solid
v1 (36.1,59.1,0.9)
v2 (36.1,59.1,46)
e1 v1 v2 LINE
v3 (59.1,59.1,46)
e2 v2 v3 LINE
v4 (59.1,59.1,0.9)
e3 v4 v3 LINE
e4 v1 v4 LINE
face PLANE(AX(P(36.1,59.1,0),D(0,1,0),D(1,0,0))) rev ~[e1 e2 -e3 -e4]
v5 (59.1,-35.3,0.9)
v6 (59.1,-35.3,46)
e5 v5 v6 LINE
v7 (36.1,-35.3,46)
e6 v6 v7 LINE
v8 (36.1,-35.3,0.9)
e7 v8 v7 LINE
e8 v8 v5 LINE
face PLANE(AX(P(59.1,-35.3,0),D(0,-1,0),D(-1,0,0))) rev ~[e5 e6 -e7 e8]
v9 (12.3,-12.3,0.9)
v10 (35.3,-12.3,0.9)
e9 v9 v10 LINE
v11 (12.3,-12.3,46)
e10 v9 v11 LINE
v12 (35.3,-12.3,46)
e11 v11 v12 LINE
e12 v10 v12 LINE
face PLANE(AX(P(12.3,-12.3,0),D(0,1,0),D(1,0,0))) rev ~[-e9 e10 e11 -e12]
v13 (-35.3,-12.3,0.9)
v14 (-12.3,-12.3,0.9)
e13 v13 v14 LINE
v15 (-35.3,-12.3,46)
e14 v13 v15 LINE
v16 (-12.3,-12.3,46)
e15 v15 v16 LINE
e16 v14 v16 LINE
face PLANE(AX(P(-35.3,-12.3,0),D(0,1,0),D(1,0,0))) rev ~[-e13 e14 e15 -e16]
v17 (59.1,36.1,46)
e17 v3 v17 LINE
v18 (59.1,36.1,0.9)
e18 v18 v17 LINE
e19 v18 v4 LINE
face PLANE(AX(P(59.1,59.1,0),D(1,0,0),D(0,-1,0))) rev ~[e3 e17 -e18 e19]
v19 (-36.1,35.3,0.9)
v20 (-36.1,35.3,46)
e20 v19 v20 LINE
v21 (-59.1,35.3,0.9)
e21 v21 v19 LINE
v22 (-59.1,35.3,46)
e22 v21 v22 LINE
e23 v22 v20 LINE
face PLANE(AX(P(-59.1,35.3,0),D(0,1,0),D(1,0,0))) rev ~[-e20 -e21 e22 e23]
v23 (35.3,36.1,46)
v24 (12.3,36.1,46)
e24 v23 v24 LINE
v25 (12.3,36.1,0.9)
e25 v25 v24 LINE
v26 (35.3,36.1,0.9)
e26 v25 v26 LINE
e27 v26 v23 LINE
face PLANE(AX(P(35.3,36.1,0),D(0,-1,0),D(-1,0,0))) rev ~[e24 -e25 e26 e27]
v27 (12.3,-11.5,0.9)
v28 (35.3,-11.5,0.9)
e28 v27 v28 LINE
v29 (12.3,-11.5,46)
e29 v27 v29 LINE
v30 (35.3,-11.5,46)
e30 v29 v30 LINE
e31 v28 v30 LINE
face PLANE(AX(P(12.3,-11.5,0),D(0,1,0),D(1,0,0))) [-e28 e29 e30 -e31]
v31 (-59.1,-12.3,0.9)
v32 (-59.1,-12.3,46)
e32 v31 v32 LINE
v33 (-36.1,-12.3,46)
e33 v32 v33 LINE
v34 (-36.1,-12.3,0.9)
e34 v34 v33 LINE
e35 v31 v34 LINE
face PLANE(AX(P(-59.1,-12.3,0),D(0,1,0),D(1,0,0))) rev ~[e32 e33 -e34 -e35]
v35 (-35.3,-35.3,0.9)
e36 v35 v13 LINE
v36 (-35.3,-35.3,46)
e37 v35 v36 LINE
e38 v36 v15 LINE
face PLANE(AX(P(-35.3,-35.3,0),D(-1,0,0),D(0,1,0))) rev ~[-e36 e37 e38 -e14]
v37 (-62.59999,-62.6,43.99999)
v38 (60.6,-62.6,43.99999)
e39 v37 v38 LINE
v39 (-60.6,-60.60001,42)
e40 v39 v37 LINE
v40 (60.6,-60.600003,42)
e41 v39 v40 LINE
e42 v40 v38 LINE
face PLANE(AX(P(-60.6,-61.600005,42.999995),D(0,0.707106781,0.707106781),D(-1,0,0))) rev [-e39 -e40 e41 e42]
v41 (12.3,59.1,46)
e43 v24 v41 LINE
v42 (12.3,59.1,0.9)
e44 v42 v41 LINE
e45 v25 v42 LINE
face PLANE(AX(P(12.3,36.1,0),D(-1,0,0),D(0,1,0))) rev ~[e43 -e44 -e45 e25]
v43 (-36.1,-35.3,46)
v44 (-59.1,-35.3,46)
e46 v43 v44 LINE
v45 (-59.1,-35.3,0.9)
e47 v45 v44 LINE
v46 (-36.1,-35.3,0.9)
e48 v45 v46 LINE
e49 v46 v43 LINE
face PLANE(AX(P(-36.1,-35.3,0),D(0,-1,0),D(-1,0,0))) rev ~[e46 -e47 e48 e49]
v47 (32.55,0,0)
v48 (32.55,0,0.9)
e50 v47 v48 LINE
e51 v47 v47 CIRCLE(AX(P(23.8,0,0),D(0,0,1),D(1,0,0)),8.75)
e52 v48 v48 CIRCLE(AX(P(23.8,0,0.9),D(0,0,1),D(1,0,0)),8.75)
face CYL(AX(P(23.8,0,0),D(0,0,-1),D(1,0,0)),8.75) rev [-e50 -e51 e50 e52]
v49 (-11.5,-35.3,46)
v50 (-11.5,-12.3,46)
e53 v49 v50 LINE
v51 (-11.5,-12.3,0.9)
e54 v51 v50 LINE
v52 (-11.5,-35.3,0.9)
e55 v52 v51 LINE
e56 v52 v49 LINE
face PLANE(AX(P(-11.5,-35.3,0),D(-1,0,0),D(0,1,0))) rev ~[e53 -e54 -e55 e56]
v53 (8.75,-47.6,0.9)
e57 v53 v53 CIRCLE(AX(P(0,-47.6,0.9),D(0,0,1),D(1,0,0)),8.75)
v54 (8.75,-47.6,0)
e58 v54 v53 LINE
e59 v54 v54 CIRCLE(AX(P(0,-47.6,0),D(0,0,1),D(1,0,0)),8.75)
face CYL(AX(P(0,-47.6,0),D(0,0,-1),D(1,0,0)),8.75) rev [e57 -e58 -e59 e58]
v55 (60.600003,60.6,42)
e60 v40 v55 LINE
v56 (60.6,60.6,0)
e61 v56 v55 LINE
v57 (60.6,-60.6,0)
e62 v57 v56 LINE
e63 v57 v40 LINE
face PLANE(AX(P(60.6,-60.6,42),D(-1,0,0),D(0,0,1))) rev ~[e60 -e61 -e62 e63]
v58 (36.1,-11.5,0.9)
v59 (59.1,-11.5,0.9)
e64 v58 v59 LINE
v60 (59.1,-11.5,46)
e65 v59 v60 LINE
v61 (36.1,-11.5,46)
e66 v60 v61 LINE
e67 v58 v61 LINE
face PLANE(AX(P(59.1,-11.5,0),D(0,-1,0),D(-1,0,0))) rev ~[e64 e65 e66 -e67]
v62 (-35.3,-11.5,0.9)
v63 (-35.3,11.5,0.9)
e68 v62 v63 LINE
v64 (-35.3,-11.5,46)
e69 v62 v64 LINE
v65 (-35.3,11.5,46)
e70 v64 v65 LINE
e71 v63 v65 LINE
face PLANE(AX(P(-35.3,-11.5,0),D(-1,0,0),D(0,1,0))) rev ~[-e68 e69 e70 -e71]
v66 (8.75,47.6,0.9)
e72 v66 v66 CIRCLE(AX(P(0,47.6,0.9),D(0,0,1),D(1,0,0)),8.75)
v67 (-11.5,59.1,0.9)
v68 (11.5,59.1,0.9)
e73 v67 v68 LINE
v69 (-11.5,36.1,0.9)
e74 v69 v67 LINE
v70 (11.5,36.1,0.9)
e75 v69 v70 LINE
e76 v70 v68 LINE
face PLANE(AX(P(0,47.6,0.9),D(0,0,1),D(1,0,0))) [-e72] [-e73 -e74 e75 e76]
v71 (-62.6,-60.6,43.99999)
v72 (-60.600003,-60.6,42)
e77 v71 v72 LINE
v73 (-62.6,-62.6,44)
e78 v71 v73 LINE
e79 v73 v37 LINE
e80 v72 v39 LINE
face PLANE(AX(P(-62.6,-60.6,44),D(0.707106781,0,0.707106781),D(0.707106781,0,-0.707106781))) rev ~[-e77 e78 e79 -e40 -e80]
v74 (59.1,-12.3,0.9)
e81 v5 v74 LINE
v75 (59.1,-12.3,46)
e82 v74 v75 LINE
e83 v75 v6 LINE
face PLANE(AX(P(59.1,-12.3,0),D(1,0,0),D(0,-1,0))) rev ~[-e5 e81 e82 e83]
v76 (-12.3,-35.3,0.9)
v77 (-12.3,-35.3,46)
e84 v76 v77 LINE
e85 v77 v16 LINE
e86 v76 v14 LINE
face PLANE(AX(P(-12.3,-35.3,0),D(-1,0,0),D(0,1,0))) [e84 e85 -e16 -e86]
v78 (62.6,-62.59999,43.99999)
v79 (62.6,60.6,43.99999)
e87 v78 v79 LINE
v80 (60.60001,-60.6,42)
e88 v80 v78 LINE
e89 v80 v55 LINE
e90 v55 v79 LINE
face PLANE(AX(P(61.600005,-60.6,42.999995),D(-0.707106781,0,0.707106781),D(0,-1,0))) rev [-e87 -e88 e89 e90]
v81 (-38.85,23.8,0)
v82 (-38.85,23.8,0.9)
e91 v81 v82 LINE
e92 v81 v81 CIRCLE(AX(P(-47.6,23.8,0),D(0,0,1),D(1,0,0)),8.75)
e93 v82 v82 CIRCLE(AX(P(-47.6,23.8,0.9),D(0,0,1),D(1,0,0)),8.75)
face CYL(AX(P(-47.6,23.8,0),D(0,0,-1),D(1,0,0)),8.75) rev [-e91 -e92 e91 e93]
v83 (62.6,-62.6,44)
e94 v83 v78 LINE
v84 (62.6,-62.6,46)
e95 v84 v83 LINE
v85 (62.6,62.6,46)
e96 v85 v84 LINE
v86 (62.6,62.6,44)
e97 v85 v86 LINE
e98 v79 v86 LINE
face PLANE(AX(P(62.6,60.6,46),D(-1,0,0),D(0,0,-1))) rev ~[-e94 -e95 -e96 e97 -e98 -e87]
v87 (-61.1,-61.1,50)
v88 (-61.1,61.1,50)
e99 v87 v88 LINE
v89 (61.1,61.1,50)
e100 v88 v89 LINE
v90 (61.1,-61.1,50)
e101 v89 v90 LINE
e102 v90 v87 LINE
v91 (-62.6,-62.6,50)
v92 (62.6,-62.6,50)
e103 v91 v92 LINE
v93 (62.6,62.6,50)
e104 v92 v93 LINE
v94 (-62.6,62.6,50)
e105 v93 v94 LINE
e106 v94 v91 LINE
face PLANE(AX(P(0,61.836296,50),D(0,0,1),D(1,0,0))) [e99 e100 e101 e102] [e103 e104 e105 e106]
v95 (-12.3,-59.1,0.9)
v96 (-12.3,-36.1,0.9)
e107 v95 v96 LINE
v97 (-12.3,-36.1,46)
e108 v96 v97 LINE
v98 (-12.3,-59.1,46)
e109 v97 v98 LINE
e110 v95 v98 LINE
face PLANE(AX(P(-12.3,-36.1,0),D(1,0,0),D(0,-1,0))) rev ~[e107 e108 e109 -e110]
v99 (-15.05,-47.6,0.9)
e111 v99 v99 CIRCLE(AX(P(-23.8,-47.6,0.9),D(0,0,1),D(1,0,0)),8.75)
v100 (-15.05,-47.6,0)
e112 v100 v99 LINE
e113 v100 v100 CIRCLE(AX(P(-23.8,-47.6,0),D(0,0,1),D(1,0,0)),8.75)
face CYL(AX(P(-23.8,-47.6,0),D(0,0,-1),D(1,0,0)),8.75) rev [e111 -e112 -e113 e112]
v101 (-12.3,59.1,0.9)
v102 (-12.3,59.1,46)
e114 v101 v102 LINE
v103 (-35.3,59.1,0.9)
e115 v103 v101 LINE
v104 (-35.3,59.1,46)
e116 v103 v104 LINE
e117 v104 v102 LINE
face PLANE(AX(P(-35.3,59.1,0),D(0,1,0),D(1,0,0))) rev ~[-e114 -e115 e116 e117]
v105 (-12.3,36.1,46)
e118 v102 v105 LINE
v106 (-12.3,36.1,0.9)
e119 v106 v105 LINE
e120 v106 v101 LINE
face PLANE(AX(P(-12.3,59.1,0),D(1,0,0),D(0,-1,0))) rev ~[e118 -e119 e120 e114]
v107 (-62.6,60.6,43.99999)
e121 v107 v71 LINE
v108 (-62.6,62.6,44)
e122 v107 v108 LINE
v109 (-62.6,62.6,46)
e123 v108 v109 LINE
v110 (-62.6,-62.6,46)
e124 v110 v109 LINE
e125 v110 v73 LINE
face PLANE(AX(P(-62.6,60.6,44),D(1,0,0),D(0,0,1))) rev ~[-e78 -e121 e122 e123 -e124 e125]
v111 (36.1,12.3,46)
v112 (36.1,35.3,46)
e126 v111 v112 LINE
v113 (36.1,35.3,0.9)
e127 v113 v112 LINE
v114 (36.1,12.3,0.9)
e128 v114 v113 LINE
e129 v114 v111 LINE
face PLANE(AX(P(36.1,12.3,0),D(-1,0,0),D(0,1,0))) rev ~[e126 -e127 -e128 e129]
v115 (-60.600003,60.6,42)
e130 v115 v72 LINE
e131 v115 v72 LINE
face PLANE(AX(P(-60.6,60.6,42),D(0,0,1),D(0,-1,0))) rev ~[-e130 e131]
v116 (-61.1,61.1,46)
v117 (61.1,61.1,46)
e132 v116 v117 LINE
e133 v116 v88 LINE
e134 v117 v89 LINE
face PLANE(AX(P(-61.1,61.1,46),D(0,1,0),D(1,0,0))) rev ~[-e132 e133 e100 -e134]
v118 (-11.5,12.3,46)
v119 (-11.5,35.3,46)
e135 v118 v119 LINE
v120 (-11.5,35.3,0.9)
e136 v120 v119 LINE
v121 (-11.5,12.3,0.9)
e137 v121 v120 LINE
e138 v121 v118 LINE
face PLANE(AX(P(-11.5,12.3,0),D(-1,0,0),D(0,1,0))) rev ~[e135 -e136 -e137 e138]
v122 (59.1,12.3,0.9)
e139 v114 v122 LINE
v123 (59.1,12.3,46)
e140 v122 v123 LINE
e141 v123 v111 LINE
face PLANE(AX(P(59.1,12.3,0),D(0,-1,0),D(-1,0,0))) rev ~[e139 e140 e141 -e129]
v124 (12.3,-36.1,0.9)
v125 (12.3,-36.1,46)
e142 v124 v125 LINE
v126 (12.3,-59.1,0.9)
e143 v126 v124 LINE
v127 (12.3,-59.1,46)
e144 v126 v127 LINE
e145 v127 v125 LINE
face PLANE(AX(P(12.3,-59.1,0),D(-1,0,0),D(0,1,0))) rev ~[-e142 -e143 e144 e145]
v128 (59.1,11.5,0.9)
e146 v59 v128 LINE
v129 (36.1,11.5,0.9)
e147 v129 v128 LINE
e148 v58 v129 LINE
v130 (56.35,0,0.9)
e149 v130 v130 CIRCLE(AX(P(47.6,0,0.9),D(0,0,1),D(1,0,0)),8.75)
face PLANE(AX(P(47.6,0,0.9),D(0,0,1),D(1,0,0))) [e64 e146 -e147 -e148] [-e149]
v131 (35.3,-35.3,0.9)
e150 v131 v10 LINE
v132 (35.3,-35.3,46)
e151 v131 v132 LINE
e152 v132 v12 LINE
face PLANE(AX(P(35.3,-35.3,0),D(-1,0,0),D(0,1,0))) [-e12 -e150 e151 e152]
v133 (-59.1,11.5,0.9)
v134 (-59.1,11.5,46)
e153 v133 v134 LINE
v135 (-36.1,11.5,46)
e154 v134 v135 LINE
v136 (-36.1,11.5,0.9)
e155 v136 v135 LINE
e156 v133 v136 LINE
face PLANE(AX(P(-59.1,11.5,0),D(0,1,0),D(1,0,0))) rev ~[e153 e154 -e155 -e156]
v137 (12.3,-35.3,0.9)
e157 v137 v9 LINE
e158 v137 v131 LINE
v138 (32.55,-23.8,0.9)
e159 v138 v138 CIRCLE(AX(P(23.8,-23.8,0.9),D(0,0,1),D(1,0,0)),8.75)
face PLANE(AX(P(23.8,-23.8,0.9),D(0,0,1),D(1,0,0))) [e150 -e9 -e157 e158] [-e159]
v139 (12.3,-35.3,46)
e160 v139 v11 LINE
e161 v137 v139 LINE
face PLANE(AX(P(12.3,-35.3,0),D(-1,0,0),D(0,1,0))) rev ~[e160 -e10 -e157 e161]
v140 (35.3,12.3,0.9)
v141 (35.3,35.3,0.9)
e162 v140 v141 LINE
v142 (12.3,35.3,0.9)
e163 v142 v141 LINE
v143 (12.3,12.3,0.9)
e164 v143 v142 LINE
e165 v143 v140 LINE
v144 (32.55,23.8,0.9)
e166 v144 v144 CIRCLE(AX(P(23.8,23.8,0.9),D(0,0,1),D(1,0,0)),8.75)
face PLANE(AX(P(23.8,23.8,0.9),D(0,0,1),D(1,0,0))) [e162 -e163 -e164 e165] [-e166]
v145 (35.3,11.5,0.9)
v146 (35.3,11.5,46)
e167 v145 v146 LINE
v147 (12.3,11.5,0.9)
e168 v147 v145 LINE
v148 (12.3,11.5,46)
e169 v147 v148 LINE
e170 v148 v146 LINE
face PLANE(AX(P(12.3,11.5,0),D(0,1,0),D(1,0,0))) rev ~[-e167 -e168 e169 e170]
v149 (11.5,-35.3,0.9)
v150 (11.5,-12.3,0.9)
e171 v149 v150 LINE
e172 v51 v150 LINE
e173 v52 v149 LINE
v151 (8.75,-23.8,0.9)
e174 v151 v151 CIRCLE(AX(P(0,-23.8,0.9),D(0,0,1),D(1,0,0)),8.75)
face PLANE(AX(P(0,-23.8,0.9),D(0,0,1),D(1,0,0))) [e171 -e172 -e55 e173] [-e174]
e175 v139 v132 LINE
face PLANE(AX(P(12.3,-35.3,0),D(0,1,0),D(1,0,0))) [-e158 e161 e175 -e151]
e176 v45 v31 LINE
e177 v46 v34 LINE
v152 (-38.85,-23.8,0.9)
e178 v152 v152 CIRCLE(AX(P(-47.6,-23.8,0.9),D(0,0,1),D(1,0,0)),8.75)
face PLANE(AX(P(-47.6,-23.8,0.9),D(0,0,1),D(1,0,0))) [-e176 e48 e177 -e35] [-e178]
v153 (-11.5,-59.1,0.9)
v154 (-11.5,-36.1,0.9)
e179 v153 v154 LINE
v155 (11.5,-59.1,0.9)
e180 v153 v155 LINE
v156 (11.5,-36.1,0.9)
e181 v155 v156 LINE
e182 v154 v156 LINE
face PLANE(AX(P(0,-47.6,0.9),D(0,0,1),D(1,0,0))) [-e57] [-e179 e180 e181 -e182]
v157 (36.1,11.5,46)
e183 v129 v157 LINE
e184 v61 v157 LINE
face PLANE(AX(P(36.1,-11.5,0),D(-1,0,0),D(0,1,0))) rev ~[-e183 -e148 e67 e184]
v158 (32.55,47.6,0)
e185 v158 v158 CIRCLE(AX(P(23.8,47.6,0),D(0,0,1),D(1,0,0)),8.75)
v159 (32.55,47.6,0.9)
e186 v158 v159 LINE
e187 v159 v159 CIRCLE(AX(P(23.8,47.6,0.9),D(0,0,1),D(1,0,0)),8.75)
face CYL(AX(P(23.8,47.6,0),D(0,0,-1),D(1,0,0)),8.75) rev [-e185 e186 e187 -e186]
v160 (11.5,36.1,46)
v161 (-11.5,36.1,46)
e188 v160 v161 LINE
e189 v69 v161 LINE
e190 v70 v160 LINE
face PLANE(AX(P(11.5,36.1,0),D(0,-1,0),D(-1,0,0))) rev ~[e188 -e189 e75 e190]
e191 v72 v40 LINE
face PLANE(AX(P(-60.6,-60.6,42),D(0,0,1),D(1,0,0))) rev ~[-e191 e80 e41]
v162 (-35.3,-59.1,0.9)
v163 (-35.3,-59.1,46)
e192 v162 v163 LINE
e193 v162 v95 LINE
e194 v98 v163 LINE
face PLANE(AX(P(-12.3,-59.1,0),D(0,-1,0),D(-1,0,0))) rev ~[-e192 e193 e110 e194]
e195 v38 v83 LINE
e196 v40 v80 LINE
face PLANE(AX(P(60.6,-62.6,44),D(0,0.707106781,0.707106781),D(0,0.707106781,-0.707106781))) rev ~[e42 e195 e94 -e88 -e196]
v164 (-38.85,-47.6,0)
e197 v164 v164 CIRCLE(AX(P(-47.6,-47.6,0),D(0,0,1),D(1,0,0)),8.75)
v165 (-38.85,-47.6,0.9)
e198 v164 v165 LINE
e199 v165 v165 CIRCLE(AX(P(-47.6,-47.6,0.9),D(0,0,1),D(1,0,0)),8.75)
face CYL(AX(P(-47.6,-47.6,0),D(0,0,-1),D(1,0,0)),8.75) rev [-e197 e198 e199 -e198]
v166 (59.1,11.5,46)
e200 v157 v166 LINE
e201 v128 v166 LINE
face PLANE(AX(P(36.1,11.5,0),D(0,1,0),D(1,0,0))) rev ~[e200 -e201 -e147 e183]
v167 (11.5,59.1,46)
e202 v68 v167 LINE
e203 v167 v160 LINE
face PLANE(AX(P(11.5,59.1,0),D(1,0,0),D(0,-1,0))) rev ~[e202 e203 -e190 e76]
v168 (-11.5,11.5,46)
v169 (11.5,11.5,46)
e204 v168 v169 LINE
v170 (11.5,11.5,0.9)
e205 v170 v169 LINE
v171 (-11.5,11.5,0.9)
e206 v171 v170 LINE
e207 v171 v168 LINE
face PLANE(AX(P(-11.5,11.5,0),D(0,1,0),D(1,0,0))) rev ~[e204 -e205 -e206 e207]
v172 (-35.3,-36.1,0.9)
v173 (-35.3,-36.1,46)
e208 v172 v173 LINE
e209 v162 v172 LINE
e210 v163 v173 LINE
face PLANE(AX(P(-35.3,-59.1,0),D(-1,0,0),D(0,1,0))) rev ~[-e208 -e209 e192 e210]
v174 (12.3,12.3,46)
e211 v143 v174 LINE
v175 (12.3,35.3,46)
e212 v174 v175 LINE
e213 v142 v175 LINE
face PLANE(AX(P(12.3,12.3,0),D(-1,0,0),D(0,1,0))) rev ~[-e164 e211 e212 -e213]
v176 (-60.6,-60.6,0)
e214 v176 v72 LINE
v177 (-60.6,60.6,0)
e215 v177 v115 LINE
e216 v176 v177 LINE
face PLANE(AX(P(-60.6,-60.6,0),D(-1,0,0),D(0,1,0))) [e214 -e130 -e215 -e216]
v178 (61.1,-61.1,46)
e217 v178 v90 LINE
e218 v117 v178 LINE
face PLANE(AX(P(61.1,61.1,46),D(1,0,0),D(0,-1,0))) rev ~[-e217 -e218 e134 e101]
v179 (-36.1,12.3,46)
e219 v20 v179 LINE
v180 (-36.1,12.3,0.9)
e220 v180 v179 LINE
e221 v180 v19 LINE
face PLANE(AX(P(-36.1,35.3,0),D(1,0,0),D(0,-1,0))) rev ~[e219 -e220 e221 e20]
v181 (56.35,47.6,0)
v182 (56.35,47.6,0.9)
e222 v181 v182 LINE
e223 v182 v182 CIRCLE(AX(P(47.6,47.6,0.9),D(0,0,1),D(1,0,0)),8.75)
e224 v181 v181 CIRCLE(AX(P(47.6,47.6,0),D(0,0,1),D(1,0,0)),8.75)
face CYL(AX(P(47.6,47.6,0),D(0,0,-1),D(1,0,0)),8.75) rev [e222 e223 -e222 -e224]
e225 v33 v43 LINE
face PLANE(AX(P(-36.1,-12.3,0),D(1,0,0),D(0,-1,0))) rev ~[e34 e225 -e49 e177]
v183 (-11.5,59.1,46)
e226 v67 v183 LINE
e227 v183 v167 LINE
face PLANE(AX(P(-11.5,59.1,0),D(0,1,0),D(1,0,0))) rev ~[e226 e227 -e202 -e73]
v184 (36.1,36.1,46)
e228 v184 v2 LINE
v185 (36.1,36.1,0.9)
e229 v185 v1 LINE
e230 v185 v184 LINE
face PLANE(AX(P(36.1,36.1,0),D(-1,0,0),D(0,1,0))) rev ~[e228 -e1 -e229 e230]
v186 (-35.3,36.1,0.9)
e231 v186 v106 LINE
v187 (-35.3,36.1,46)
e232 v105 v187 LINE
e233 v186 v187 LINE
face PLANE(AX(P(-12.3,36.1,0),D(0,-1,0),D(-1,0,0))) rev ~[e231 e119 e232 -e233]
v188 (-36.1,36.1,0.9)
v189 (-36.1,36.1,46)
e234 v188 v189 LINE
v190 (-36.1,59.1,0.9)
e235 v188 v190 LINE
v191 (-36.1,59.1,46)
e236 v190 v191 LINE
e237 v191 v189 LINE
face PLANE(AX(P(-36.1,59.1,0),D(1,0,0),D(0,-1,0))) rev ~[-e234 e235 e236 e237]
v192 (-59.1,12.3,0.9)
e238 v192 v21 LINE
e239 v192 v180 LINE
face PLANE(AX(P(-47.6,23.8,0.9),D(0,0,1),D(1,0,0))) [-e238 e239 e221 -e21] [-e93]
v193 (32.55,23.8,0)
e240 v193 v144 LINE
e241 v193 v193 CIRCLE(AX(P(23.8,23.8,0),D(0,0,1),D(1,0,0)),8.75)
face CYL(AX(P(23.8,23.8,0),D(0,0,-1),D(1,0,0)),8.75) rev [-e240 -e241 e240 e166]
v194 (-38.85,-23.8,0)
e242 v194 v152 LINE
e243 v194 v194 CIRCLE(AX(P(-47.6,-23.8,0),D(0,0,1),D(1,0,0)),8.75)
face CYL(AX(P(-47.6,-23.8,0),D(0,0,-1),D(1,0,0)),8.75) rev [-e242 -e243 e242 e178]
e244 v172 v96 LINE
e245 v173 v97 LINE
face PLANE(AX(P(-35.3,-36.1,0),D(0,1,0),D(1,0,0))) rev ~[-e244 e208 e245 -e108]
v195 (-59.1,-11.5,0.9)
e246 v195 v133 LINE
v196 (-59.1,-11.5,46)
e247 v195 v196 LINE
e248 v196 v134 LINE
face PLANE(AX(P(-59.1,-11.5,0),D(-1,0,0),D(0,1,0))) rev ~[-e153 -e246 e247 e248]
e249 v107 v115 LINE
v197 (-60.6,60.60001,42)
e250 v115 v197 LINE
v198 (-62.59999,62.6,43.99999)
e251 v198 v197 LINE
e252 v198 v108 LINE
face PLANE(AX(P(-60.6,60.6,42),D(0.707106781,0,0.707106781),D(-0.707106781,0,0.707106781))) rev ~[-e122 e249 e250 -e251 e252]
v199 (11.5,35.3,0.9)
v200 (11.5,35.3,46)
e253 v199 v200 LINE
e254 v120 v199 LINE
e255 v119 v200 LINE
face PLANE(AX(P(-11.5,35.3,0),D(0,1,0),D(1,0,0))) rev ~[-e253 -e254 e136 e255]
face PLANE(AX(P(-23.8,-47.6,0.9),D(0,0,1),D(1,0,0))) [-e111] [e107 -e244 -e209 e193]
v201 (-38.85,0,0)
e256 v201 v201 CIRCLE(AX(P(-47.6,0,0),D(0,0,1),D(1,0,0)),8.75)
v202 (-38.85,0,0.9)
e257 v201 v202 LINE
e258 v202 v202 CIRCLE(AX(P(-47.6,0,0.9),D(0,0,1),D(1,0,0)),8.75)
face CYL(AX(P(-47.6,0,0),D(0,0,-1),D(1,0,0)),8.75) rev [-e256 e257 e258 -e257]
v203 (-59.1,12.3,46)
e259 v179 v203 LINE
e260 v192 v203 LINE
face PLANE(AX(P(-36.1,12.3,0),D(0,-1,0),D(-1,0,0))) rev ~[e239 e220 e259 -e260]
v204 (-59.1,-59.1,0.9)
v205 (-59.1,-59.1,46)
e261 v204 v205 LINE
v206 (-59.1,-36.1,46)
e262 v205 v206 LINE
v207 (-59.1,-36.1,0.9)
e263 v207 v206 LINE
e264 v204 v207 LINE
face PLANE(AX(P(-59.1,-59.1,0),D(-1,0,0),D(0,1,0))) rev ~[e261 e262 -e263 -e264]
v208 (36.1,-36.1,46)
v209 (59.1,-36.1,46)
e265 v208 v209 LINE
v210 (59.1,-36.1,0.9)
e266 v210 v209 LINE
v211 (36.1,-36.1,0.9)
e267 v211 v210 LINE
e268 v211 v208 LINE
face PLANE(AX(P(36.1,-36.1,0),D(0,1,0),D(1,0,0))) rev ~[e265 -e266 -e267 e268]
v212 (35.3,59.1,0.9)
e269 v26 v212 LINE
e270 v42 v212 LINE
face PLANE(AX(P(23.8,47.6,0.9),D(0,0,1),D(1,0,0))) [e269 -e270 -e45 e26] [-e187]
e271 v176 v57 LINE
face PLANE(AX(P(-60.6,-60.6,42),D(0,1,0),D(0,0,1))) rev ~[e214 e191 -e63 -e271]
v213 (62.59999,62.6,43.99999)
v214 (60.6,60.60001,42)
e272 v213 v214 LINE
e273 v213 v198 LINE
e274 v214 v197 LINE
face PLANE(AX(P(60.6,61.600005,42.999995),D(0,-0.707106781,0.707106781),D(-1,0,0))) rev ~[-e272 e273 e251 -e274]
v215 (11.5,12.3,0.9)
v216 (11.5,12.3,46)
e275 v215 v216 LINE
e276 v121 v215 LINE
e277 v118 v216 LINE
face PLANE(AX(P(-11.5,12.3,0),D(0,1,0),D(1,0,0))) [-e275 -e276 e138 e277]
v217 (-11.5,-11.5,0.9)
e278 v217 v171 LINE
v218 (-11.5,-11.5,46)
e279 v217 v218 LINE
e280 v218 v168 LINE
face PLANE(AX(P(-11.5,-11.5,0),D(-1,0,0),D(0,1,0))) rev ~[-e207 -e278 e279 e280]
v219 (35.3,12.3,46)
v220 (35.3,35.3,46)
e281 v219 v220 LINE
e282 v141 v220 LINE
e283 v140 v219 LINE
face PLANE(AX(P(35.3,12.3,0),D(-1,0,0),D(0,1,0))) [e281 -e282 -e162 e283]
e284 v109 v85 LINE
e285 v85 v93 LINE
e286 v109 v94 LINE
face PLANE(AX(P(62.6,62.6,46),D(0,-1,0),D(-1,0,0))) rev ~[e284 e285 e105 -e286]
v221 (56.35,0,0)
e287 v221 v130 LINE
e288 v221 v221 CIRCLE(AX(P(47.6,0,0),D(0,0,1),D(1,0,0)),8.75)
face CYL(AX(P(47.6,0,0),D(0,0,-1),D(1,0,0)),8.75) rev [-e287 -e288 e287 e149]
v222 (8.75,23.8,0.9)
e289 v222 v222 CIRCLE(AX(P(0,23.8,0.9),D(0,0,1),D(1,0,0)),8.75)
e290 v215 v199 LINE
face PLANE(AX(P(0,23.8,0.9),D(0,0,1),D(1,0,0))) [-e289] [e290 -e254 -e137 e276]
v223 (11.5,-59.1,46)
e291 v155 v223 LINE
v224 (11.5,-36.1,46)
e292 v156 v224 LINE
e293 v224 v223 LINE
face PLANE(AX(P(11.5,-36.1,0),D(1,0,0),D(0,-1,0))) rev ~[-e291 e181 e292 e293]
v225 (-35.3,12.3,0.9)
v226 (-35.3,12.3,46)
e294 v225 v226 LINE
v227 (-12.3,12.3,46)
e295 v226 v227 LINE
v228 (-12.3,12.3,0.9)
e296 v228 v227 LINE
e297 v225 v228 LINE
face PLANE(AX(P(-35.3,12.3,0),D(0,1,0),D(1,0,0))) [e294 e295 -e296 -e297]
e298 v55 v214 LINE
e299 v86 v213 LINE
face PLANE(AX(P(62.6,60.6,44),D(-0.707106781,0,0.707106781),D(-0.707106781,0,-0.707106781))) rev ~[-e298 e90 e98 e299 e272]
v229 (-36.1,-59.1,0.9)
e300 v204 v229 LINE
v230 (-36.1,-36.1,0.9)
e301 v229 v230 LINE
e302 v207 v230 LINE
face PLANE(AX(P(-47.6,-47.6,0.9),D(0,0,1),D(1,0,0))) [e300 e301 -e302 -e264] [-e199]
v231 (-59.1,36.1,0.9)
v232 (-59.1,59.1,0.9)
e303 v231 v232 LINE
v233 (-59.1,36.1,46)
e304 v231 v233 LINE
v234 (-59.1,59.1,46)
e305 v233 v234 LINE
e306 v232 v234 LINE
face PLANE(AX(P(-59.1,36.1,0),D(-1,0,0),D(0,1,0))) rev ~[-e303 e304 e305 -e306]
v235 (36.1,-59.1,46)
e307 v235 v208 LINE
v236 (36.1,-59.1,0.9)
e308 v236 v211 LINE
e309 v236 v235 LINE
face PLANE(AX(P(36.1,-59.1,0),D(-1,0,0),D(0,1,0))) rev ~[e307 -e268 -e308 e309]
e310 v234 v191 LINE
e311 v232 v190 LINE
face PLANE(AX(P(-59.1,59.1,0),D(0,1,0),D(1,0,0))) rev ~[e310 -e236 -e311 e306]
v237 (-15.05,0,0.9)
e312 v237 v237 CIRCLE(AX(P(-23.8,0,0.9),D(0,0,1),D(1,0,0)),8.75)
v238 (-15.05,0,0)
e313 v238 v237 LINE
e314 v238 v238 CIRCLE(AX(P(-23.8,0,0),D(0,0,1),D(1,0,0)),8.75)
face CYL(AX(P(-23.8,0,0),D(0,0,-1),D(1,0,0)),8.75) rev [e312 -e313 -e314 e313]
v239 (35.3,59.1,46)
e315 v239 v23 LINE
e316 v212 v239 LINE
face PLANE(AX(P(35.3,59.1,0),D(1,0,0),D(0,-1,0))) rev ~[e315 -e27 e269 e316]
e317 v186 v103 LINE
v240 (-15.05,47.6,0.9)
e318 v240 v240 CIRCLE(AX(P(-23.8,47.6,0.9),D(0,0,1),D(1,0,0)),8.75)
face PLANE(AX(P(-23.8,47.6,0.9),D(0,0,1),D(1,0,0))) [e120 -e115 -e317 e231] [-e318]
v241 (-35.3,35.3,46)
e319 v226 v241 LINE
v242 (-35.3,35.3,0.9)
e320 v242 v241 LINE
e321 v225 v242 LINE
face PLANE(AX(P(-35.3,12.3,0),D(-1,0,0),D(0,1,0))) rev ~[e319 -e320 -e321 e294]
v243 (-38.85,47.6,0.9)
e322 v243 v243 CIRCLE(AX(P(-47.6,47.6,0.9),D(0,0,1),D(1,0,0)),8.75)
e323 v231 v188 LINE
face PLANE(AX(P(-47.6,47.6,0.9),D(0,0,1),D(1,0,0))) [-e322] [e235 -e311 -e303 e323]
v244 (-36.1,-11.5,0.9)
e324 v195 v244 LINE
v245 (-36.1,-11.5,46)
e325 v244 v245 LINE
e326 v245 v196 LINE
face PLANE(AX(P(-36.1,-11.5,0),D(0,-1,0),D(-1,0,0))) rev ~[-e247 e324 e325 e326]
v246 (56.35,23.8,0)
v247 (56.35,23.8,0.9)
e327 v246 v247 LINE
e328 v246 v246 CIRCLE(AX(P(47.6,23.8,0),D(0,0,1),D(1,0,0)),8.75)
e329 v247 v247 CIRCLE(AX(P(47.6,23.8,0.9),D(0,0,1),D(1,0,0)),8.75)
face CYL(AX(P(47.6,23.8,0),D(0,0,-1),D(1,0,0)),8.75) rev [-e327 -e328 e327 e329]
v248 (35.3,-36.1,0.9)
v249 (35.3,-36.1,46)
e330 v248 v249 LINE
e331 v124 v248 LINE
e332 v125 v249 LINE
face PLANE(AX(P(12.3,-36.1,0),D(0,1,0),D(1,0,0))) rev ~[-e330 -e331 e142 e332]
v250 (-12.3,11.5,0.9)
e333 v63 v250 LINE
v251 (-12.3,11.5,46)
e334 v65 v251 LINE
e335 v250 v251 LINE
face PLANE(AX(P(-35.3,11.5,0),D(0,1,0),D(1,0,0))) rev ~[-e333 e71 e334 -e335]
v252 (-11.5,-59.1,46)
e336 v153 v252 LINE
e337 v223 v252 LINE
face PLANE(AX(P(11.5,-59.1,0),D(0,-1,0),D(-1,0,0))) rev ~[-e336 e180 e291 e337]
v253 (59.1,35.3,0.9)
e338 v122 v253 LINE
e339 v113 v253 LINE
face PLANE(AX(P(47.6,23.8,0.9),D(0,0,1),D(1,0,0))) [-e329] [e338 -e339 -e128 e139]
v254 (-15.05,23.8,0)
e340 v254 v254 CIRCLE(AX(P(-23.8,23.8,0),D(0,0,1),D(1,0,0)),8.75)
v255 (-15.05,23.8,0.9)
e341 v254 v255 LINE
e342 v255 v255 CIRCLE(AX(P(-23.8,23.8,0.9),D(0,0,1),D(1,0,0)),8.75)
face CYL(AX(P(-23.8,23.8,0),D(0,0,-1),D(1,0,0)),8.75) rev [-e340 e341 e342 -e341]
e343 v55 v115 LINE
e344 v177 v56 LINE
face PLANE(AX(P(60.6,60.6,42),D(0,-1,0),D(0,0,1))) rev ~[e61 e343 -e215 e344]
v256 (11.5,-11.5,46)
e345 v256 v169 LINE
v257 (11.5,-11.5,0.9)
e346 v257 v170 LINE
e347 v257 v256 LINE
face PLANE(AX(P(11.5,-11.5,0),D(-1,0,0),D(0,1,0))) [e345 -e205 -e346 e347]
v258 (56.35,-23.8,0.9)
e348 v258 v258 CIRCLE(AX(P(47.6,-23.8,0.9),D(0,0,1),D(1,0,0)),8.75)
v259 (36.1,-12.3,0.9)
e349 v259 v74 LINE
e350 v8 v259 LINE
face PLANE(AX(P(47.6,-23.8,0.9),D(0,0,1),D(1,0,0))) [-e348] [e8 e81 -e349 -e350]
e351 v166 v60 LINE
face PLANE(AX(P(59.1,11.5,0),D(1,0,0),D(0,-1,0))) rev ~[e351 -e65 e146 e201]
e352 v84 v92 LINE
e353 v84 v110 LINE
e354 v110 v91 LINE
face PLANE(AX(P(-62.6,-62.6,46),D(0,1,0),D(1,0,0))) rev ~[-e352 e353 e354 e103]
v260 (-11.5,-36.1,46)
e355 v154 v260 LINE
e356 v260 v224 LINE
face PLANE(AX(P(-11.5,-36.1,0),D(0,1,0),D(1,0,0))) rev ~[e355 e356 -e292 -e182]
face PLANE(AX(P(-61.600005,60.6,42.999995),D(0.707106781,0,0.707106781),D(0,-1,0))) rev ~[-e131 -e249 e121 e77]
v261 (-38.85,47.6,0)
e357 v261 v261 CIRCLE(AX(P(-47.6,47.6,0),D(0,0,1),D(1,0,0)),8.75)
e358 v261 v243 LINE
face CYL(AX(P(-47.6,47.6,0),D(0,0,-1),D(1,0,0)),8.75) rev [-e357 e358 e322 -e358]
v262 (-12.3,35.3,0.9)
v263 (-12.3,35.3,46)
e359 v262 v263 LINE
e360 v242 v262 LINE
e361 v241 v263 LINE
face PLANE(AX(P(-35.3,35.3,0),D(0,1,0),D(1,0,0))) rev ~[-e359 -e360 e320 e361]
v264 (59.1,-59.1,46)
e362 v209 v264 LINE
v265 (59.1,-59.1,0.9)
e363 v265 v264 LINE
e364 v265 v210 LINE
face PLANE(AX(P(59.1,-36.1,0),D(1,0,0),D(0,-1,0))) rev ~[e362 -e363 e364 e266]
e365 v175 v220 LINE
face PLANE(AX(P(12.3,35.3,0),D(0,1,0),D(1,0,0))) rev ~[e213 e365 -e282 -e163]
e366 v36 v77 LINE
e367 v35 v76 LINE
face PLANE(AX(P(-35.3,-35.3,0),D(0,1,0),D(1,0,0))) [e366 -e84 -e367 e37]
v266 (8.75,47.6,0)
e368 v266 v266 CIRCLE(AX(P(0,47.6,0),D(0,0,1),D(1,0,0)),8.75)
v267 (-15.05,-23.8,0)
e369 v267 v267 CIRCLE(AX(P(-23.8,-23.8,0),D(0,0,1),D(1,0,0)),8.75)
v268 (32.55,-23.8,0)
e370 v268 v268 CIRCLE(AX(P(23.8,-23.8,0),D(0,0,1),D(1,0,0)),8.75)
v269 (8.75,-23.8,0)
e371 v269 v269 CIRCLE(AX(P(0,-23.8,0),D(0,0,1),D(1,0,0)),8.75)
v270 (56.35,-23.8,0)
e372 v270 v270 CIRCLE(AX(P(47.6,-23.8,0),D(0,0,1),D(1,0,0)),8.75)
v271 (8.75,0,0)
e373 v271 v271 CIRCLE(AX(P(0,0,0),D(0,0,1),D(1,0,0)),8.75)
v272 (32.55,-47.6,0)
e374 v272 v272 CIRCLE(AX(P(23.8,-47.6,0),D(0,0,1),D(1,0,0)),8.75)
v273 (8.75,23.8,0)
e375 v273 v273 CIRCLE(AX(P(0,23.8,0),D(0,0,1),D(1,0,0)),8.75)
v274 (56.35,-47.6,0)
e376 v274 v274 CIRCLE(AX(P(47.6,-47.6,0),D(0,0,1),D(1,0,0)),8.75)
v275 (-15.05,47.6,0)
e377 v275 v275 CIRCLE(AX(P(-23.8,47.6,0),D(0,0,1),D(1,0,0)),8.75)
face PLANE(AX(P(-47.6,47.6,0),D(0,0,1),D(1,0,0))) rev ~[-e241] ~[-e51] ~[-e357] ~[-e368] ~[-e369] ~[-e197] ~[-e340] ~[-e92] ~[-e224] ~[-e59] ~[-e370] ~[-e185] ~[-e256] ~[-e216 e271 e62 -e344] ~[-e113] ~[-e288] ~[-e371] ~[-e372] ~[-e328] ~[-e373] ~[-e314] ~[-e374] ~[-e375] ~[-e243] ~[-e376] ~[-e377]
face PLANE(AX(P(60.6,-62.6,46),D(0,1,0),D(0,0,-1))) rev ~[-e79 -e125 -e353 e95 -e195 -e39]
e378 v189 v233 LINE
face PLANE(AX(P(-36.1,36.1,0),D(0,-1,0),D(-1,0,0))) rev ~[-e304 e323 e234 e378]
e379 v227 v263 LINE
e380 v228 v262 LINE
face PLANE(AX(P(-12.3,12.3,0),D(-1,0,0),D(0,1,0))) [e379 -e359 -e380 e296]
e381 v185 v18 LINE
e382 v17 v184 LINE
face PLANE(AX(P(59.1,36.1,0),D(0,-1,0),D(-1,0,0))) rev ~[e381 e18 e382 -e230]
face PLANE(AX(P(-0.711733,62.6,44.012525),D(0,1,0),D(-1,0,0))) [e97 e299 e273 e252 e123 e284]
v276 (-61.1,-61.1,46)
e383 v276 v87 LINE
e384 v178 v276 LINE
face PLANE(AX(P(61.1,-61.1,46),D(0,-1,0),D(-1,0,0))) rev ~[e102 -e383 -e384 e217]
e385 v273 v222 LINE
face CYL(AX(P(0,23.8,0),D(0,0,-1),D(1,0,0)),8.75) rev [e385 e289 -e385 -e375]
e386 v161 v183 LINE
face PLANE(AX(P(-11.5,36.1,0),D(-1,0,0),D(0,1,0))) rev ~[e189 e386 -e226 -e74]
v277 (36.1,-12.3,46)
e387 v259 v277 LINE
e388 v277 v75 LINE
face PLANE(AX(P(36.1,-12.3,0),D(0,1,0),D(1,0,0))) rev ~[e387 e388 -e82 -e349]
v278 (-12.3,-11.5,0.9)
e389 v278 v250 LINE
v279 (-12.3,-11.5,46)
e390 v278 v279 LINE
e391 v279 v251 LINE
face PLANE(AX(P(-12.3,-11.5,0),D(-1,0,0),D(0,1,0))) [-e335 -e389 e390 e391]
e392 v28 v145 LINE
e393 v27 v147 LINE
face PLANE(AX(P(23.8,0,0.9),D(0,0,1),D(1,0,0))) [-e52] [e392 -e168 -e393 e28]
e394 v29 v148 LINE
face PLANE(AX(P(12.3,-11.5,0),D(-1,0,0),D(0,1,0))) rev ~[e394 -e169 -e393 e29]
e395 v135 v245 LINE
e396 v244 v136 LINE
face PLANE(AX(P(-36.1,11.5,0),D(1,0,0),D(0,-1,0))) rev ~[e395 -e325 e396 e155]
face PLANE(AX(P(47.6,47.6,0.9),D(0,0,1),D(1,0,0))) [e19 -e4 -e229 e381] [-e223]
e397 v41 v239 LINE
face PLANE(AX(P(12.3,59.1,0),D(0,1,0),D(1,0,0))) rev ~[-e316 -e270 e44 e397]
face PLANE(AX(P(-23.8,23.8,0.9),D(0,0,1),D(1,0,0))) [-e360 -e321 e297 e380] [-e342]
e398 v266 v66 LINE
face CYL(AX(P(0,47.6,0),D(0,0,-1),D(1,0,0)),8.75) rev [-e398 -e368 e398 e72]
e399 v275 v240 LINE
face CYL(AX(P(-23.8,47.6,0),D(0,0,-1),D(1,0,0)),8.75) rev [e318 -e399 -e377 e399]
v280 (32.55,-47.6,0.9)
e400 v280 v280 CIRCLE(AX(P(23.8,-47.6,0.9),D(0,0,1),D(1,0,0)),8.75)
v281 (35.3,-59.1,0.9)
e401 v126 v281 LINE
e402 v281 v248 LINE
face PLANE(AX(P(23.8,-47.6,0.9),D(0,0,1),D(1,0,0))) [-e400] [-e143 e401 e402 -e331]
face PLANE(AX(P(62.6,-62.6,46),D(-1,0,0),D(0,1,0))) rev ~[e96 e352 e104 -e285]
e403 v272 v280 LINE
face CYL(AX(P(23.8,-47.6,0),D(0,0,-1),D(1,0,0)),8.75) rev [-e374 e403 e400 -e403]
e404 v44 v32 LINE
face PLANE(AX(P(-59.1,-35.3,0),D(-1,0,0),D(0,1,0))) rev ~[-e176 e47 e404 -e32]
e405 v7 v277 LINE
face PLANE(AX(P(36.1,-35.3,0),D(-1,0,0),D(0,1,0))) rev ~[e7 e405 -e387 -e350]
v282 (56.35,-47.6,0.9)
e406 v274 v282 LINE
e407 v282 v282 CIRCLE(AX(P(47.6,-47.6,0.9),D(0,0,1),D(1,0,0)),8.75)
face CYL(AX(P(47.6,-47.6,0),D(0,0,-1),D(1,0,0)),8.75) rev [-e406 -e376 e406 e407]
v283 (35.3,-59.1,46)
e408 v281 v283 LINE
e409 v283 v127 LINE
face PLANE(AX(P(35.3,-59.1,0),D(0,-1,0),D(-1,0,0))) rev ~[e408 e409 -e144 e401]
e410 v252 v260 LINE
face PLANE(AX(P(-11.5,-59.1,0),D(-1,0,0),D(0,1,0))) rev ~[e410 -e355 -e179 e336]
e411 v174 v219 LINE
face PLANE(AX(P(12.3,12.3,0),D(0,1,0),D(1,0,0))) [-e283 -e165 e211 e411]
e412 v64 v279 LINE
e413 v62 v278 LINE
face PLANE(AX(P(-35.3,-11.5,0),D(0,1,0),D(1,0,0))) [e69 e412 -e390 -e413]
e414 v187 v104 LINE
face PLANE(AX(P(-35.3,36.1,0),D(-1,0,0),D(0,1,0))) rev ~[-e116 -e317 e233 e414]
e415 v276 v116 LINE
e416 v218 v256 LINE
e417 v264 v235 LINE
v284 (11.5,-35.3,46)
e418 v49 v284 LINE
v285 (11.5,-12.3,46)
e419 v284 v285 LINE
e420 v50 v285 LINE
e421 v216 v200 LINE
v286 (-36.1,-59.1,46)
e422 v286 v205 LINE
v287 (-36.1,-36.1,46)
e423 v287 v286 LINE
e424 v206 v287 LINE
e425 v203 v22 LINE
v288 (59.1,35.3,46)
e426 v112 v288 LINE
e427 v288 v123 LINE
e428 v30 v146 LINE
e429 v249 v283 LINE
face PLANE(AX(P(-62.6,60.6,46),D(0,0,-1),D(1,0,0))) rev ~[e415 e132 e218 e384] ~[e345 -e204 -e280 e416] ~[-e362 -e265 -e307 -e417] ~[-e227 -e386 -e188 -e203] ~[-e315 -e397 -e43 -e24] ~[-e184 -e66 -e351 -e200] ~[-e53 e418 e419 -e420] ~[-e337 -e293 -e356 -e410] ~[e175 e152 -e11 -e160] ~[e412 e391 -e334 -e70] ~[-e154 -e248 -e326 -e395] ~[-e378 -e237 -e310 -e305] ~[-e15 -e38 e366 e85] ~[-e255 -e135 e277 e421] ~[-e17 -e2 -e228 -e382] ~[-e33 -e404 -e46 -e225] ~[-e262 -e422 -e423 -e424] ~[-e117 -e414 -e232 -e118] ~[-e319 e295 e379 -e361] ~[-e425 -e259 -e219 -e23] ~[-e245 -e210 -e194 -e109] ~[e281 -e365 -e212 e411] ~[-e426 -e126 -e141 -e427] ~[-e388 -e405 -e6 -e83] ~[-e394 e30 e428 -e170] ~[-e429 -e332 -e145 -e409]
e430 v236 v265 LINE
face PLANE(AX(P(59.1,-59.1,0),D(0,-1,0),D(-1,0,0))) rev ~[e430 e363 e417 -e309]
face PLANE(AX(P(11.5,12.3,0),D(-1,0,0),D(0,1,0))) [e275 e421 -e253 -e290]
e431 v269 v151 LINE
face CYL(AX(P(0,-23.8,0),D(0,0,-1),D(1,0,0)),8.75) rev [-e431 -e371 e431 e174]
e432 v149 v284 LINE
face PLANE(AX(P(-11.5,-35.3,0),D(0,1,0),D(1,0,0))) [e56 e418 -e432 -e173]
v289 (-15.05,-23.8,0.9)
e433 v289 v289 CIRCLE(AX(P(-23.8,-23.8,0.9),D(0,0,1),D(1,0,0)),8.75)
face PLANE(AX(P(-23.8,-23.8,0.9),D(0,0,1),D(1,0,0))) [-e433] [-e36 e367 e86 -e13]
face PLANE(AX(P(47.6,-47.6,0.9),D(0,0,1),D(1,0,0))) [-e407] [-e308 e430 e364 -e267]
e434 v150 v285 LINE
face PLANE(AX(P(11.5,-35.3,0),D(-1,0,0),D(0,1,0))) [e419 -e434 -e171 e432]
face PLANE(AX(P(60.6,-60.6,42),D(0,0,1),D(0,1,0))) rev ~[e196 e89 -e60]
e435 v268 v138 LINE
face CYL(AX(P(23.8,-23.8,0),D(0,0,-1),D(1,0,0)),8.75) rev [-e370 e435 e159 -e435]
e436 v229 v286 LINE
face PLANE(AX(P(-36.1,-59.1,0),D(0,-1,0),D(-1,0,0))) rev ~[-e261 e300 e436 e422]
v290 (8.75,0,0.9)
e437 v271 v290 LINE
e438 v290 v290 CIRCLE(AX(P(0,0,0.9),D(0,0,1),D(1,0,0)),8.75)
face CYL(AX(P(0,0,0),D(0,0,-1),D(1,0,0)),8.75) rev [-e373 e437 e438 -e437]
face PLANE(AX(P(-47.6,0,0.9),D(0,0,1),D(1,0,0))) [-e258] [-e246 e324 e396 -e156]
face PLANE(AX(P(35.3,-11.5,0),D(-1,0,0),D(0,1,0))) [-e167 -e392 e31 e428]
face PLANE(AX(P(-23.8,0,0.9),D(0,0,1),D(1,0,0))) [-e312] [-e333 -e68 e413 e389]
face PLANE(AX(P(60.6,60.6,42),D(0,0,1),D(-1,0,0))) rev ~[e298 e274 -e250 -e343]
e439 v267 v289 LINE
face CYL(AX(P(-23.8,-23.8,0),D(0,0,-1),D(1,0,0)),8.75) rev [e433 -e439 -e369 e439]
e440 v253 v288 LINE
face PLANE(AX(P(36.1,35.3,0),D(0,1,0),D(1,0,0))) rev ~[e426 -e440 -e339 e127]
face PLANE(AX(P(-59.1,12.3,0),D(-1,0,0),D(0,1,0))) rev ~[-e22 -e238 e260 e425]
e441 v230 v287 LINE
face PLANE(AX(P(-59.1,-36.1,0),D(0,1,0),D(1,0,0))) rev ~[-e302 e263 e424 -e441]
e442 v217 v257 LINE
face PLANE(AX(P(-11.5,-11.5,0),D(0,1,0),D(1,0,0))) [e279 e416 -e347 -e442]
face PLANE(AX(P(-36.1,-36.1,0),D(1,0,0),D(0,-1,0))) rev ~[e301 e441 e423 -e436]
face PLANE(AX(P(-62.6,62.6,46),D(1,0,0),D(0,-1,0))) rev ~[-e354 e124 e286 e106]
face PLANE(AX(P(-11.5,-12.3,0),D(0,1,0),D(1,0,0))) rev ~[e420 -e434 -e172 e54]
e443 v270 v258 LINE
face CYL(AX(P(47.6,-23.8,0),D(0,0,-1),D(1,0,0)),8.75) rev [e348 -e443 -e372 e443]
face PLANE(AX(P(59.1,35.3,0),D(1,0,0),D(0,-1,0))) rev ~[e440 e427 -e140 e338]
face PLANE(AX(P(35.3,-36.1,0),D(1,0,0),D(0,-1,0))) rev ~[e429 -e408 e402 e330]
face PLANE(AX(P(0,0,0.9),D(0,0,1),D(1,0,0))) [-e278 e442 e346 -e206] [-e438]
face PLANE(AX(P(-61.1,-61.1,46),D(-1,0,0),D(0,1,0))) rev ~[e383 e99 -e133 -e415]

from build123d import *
from build123d import SkipClean  # not in build123d's __all__

# Parameters (mm, degrees)
F0_W      = 121.2
F0_H      = 121.2
F0_W_2    = 23
F0_H_2    = 23
F1_DEPTH  = 46
F0_R      = 8.75
F2_DEPTH  = 0.9
F3_W      = 121.2
F3_H      = 4
F4_DEPTH  = 2
F5_SIZE   = 1.99999
F7_DEPTH  = 2
F8_SIZE   = 1.99999
F9_W      = 121.2
F9_H      = 4
F10_DEPTH = 2
F11_SIZE  = 1.99999
F13_DEPTH = 2
F14_SIZE  = 1.99999
F15_W     = 1.5
F15_H     = 121.2
F16_DEPTH = 4


# Not quite as in the source:
# - a fillet or chamfer is up to 0.001 mm smaller than in the source, because OpenCascade refuses the exact size
# - a feature names something its author has since deleted; it is built from what else it names


with BuildPart() as f1:
    # F0 (on Top) → F1 (new body)
    with BuildSketch(Plane.XY):
        Rectangle(F0_W, F0_H)
        Polygon((-59.1, 35.3), (-59.1, 36.1), (-59.1, 59.1), (-36.1, 59.1), (-35.3, 59.1), (-12.3, 59.1), (-11.5, 59.1), (11.5, 59.1), (12.3, 59.1), (35.3, 59.1), (36.1, 59.1), (59.1, 59.1), (59.1, 36.1), (59.1, 35.3), (59.1, 12.3), (59.1, 11.5), (59.1, -11.5), (59.1, -12.3), (59.1, -35.3), (59.1, -36.1), (59.1, -59.1), (36.1, -59.1), (35.3, -59.1), (12.3, -59.1), (11.5, -59.1), (-11.5, -59.1), (-12.3, -59.1), (-35.3, -59.1), (-36.1, -59.1), (-59.1, -59.1), (-59.1, -36.1), (-59.1, -35.3), (-59.1, -12.3), (-59.1, -11.5), (-59.1, 11.5), (-59.1, 12.3), align=None, mode=Mode.SUBTRACT)
        Polygon((-36.1, 36.1), (-59.1, 36.1), (-59.1, 35.3), (-36.1, 35.3), (-36.1, 12.3), (-59.1, 12.3), (-59.1, 11.5), (-36.1, 11.5), (-36.1, -11.5), (-59.1, -11.5), (-59.1, -12.3), (-36.1, -12.3), (-36.1, -35.3), (-59.1, -35.3), (-59.1, -36.1), (-36.1, -36.1), (-36.1, -59.1), (-35.3, -59.1), (-35.3, -36.1), (-12.3, -36.1), (-12.3, -59.1), (-11.5, -59.1), (-11.5, -36.1), (11.5, -36.1), (11.5, -59.1), (12.3, -59.1), (12.3, -36.1), (35.3, -36.1), (35.3, -59.1), (36.1, -59.1), (36.1, -36.1), (59.1, -36.1), (59.1, -35.3), (36.1, -35.3), (36.1, -12.3), (59.1, -12.3), (59.1, -11.5), (36.1, -11.5), (36.1, 11.5), (59.1, 11.5), (59.1, 12.3), (36.1, 12.3), (36.1, 35.3), (59.1, 35.3), (59.1, 36.1), (36.1, 36.1), (36.1, 59.1), (35.3, 59.1), (35.3, 36.1), (12.3, 36.1), (12.3, 59.1), (11.5, 59.1), (11.5, 36.1), (-11.5, 36.1), (-11.5, 59.1), (-12.3, 59.1), (-12.3, 36.1), (-35.3, 36.1), (-35.3, 59.1), (-36.1, 59.1), align=None)
        with Locations((-23.8, -23.8)):
            Rectangle(F0_W_2, F0_H_2, mode=Mode.SUBTRACT)
        with Locations((0, -23.8)):
            Rectangle(F0_W_2, F0_H_2, mode=Mode.SUBTRACT)
        with Locations((-23.8, 0)):
            Rectangle(F0_W_2, F0_H_2, mode=Mode.SUBTRACT)
        Rectangle(F0_W_2, F0_H_2, mode=Mode.SUBTRACT)
        with Locations((23.8, -23.8)):
            Rectangle(F0_W_2, F0_H_2, mode=Mode.SUBTRACT)
        with Locations((23.8, 0)):
            Rectangle(F0_W_2, F0_H_2, mode=Mode.SUBTRACT)
        with Locations((-23.8, 23.8)):
            Rectangle(F0_W_2, F0_H_2, mode=Mode.SUBTRACT)
        with Locations((0, 23.8)):
            Rectangle(F0_W_2, F0_H_2, mode=Mode.SUBTRACT)
        with Locations((23.8, 23.8)):
            Rectangle(F0_W_2, F0_H_2, mode=Mode.SUBTRACT)
    extrude(amount=F1_DEPTH)

    # F0 (on Top) → F2 (join)
    with BuildSketch(Plane.XY):
        with Locations((-47.6, 47.6)):
            Rectangle(F0_W_2, F0_H_2)
        with Locations((-47.6, 47.6)):
            Circle(F0_R, mode=Mode.SUBTRACT)
        with Locations((-23.8, 47.6)):
            Rectangle(F0_W_2, F0_H_2)
        with Locations((-23.8, 47.6)):
            Circle(F0_R, mode=Mode.SUBTRACT)
        with Locations((0, 47.6)):
            Rectangle(F0_W_2, F0_H_2)
        with Locations((0, 47.6)):
            Circle(F0_R, mode=Mode.SUBTRACT)
        with Locations((23.8, 47.6)):
            Rectangle(F0_W_2, F0_H_2)
        with Locations((23.8, 47.6)):
            Circle(F0_R, mode=Mode.SUBTRACT)
        with Locations((47.6, 47.6)):
            Rectangle(F0_W_2, F0_H_2)
        with Locations((47.6, 47.6)):
            Circle(F0_R, mode=Mode.SUBTRACT)
        with Locations((47.6, 23.8)):
            Rectangle(F0_W_2, F0_H_2)
        with Locations((47.6, 23.8)):
            Circle(F0_R, mode=Mode.SUBTRACT)
        with Locations((23.8, 23.8)):
            Rectangle(F0_W_2, F0_H_2)
        with Locations((23.8, 23.8)):
            Circle(F0_R, mode=Mode.SUBTRACT)
        with Locations((0, 23.8)):
            Rectangle(F0_W_2, F0_H_2)
        with Locations((0, 23.8)):
            Circle(F0_R, mode=Mode.SUBTRACT)
        with Locations((-23.8, 23.8)):
            Rectangle(F0_W_2, F0_H_2)
        with Locations((-23.8, 23.8)):
            Circle(F0_R, mode=Mode.SUBTRACT)
        with Locations((-47.6, 23.8)):
            Rectangle(F0_W_2, F0_H_2)
        with Locations((-47.6, 23.8)):
            Circle(F0_R, mode=Mode.SUBTRACT)
        with Locations((-47.6, 0)):
            Rectangle(F0_W_2, F0_H_2)
        with Locations((-47.6, 0)):
            Circle(F0_R, mode=Mode.SUBTRACT)
        with Locations((-23.8, 0)):
            Rectangle(F0_W_2, F0_H_2)
        with Locations((-23.8, 0)):
            Circle(F0_R, mode=Mode.SUBTRACT)
        Rectangle(F0_W_2, F0_H_2)
        Circle(F0_R, mode=Mode.SUBTRACT)
        with Locations((23.8, 0)):
            Rectangle(F0_W_2, F0_H_2)
        with Locations((23.8, 0)):
            Circle(F0_R, mode=Mode.SUBTRACT)
        with Locations((47.6, 0)):
            Rectangle(F0_W_2, F0_H_2)
        with Locations((47.6, 0)):
            Circle(F0_R, mode=Mode.SUBTRACT)
        with Locations((47.6, -23.8)):
            Rectangle(F0_W_2, F0_H_2)
        with Locations((47.6, -23.8)):
            Circle(F0_R, mode=Mode.SUBTRACT)
        with Locations((23.8, -23.8)):
            Rectangle(F0_W_2, F0_H_2)
        with Locations((23.8, -23.8)):
            Circle(F0_R, mode=Mode.SUBTRACT)
        with Locations((0, -23.8)):
            Rectangle(F0_W_2, F0_H_2)
        with Locations((0, -23.8)):
            Circle(F0_R, mode=Mode.SUBTRACT)
        with Locations((-23.8, -23.8)):
            Rectangle(F0_W_2, F0_H_2)
        with Locations((-23.8, -23.8)):
            Circle(F0_R, mode=Mode.SUBTRACT)
        with Locations((-47.6, -23.8)):
            Rectangle(F0_W_2, F0_H_2)
        with Locations((-47.6, -23.8)):
            Circle(F0_R, mode=Mode.SUBTRACT)
        with Locations((-47.6, -47.6)):
            Rectangle(F0_W_2, F0_H_2)
        with Locations((-47.6, -47.6)):
            Circle(F0_R, mode=Mode.SUBTRACT)
        with Locations((-23.8, -47.6)):
            Rectangle(F0_W_2, F0_H_2)
        with Locations((-23.8, -47.6)):
            Circle(F0_R, mode=Mode.SUBTRACT)
        with Locations((0, -47.6)):
            Rectangle(F0_W_2, F0_H_2)
        with Locations((0, -47.6)):
            Circle(F0_R, mode=Mode.SUBTRACT)
        with Locations((23.8, -47.6)):
            Rectangle(F0_W_2, F0_H_2)
        with Locations((23.8, -47.6)):
            Circle(F0_R, mode=Mode.SUBTRACT)
        with Locations((47.6, -47.6)):
            Rectangle(F0_W_2, F0_H_2)
        with Locations((47.6, -47.6)):
            Circle(F0_R, mode=Mode.SUBTRACT)
    extrude(amount=F2_DEPTH)

    # F3 (on face) → F4 (join)
    with BuildSketch(Plane(origin=(-60.6, 0, 0), x_dir=(0, -1, 0), z_dir=(-1, 0, 0))):
        with Locations((0, 44)):
            Rectangle(F3_W, F3_H)
    extrude(amount=F4_DEPTH)

    # F5 (size 2 in the source; OpenCascade refuses exactly that, so slightly less here)
    f5_edges = [f1.edges().sort_by_distance(p)[0] for p in [
        (-62.6, 0, 42),
    ]]
    chamfer(f5_edges, length=F5_SIZE)

    # F6 (on face) → F7 (join)
    with BuildSketch(Plane.XZ.offset(60.6)):
        Polygon((-62.6, 44), (-60.6, 42), (60.6, 42), (60.6, 46), (-62.6, 46), align=None)
    with SkipClean():  # cleaning this boolean's faces spoils the solid; the shape is the same uncleaned
        extrude(amount=F7_DEPTH)

    # F8 (size 2 in the source; OpenCascade refuses exactly that, so slightly less here)
    f8_edges = [f1.edges().sort_by_distance(p)[0] for p in [
        (0, -62.6, 42),
    ]]
    chamfer(f8_edges, length=F8_SIZE)

    # F9 (on face) → F10 (join)
    with BuildSketch(Plane.YZ.offset(60.6)):
        with Locations((0, 44)):
            Rectangle(F9_W, F9_H)
        Polygon((-60.6, 42), (-60.6, 46), (-62.6, 46), (-62.6, 44), align=None)
    with SkipClean():  # cleaning this boolean's faces spoils the solid; the shape is the same uncleaned
        extrude(amount=F10_DEPTH)

    # F11 (size 2 in the source; OpenCascade refuses exactly that, so slightly less here)
    f11_edges = [f1.edges().sort_by_distance(p)[0] for p in [
        (62.6, 0, 42),
    ]]
    chamfer(f11_edges, length=F11_SIZE)

    # F12 (on face) → F13 (join)
    with BuildSketch(Plane(origin=(0, 60.6, 0), x_dir=(-1, 0, 0), z_dir=(0, 1, 0))):
        Polygon((62.6, 44), (62.6, 46), (-60.6, 46), (-60.6, 42), (60.6, 42), align=None)
        Polygon((-60.6, 42), (-60.6, 46), (-62.6, 46), (-62.6, 44), align=None)
    with SkipClean():  # cleaning this boolean's faces spoils the solid; the shape is the same uncleaned
        extrude(amount=F13_DEPTH)

    # F14 (size 2 in the source; OpenCascade refuses exactly that, so slightly less here)
    f14_edges = [f1.edges().sort_by_distance(p)[0] for p in [
        (0, 62.6, 42),
    ]]
    chamfer(f14_edges, length=F14_SIZE)

    # F15 (on face) → F16 (join)
    with BuildSketch(Plane.XY.offset(46)):
        Polygon((62.6, 62.6), (-62.6, 62.6), (-62.6, 60.6), (-61.1, 60.6), (-61.1, 61.1), (61.1, 61.1), (61.1, 60.6), (62.6, 60.6), align=None)
        with Locations((-61.85, 0)):
            Rectangle(F15_W, F15_H)
        Polygon((-61.1, -60.6), (-62.6, -60.6), (-62.6, -62.6), (60.6, -62.6), (60.6, -61.1), (-61.1, -61.1), align=None)
        Polygon((62.6, -62.6), (62.6, 60.6), (61.1, 60.6), (61.1, -61.1), (60.6, -61.1), (60.6, -62.6), align=None)
    with SkipClean():  # cleaning this boolean's faces spoils the solid; the shape is the same uncleaned
        extrude(amount=F16_DEPTH)


solid = f1.part
